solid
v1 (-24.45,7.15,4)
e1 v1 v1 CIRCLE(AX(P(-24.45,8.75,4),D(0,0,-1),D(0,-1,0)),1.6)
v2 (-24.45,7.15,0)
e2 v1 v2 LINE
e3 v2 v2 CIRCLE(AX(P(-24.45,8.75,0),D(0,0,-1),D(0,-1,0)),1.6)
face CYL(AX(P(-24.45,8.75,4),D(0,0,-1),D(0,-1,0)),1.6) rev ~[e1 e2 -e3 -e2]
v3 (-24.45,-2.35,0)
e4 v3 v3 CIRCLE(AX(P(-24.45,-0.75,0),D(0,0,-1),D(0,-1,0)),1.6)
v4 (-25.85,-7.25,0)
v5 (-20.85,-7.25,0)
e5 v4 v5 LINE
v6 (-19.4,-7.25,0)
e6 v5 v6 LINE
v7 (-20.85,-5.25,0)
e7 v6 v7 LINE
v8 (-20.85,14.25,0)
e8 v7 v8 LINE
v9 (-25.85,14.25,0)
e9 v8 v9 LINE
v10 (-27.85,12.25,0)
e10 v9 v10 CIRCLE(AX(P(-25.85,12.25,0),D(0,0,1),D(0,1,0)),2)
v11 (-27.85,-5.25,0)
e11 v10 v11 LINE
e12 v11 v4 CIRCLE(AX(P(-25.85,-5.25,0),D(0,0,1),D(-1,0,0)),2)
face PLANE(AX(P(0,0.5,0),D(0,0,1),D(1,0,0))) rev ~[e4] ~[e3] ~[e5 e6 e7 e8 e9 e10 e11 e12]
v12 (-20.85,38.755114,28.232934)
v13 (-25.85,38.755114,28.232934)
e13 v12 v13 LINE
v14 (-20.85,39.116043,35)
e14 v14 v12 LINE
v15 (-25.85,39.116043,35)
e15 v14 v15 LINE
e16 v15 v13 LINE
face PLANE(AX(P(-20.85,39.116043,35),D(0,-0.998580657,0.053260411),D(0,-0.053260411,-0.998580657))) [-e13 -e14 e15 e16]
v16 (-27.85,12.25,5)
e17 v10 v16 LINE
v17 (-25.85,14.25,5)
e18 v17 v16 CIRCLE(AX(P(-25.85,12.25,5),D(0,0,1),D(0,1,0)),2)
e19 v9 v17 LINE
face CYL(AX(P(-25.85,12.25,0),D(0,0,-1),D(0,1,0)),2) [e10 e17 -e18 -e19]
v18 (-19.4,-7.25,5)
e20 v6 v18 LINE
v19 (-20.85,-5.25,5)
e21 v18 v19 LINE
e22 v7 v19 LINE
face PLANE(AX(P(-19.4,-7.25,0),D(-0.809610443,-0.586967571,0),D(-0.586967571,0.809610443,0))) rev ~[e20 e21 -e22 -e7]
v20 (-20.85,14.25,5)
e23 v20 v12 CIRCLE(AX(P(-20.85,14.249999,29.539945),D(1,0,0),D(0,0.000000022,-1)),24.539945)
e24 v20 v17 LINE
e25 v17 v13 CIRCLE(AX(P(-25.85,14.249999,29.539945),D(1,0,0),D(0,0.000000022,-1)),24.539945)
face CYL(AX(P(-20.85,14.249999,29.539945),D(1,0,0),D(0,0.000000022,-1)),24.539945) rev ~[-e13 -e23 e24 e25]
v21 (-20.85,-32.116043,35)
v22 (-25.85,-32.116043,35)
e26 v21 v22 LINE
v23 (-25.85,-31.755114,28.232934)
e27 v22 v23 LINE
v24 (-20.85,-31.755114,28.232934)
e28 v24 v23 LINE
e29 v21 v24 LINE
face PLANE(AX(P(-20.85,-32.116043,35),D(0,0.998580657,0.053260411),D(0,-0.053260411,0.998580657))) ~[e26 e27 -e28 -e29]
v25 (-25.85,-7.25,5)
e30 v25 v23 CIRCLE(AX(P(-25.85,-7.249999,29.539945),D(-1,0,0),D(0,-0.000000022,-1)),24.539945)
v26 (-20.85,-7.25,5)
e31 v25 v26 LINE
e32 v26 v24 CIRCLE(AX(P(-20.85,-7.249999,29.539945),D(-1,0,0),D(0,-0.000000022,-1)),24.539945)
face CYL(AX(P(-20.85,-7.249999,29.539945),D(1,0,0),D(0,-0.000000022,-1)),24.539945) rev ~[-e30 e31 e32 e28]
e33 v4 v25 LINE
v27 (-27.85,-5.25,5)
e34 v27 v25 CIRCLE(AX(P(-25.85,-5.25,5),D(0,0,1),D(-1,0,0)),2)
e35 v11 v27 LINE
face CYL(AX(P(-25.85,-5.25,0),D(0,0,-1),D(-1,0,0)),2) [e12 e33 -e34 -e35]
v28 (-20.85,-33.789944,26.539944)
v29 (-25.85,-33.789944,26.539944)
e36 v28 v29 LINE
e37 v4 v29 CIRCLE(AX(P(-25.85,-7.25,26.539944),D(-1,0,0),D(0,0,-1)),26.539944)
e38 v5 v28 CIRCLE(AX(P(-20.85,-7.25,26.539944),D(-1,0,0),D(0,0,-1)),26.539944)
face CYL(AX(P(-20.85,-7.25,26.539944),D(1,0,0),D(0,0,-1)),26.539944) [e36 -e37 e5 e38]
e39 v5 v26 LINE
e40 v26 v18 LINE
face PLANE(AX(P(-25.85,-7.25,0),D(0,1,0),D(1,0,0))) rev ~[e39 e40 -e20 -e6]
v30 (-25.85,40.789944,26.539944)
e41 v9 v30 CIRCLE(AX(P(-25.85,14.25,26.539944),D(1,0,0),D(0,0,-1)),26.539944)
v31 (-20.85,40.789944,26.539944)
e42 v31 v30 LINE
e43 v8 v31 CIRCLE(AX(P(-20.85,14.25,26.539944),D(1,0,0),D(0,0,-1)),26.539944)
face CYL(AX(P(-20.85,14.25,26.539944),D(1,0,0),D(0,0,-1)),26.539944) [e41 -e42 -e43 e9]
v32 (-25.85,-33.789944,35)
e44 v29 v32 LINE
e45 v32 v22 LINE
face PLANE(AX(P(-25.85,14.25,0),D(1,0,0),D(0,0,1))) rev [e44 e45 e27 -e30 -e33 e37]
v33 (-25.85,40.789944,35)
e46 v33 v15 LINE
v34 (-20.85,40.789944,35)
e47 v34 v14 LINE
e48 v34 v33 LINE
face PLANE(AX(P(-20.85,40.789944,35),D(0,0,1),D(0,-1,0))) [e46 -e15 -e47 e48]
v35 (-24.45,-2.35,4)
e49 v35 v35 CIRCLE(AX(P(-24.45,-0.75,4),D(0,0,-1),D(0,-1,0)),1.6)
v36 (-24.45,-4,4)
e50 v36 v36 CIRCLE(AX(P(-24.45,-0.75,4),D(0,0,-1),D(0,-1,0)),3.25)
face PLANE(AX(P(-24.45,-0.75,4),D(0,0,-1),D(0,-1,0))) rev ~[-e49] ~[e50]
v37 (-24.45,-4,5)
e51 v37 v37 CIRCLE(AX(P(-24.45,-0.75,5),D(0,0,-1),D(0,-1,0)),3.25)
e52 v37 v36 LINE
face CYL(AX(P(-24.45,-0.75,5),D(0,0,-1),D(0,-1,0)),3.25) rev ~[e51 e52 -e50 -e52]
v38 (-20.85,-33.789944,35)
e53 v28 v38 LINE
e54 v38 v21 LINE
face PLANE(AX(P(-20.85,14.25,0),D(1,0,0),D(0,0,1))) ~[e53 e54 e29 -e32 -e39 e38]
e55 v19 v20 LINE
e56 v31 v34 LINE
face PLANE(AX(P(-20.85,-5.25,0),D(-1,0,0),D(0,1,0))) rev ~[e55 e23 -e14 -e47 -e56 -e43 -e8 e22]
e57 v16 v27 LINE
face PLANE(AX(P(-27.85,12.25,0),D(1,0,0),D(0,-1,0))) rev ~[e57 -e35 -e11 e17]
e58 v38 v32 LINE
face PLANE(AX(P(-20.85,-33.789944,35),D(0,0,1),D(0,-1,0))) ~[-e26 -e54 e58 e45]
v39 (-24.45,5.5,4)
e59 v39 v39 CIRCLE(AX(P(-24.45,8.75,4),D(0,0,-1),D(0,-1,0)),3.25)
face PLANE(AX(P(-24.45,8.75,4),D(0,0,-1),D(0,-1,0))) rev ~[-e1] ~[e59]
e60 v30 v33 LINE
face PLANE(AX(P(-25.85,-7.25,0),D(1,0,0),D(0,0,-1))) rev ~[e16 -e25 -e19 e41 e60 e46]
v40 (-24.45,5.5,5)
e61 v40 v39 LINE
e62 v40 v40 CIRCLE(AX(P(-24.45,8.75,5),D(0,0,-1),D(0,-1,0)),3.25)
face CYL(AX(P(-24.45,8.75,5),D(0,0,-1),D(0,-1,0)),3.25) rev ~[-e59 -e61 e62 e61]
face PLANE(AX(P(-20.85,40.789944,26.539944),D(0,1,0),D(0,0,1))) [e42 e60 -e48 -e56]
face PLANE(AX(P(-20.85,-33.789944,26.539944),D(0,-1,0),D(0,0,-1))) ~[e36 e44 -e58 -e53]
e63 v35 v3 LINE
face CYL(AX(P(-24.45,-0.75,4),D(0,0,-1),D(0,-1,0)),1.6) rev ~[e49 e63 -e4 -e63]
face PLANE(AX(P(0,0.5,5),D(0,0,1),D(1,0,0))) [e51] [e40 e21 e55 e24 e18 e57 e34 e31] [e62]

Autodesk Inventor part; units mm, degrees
ref_plane "YZ Plane" through (0, 0, 0) normal (1, 0, 0) x (0, 1, 0)
ref_plane "XZ Plane" through (0, 0, 0) normal (0, 1, 0) x (-1, 0, 0)
ref_plane "XY Plane" through (0, 0, 0) normal (0, 0, 1) x (1, 0, 0)
ref_plane "Work Plane1" through (0, 0.5, 0) normal (0, 0, 1) x (1, 0, 0)
sketch "Sketch1" plane through (0, 0.5, 0) normal (0, 0, 1) x (1, 0, 0)
  arc A0 (-25.85, 13.75) -> (-27.85, 11.75) centre (-25.85, 11.75) ccw
  line L0 (-27.85, 11.75) -> (-27.85, -5.75)
  arc A1 (-27.85, -5.75) -> (-25.85, -7.75) centre (-25.85, -5.75) ccw
  line L1 (-25.85, -7.75) -> (-19.4, -7.75)
  arc A2 (-17.4, -9.75) -> (-19.4, -7.75) centre (-19.4, -9.75) ccw
  line L2 (-17.4, -9.75) -> (-17.4, -12.466667)
  arc A3 (-17.4, -12.466667) -> (-15.4, -14.466667) centre (-15.4, -12.466667) ccw
  line L3 (-15.4, -14.466667) -> (1.1, -14.466667)
  arc A4 (1.1, -14.466667) -> (3.1, -12.466667) centre (1.1, -12.466667) ccw
  line L4 (3.1, -12.466667) -> (3.1, -9.75)
  arc A5 (5.1, -7.75) -> (3.1, -9.75) centre (5.1, -9.75) ccw
  line L5 (5.1, -7.75) -> (24.95, -7.75)
  arc A6 (24.95, -7.75) -> (26.95, -5.75) centre (24.95, -5.75) ccw
  line L6 (26.95, -5.75) -> (26.95, 11.941667)
  arc A7 (26.95, 11.941667) -> (24.95, 13.941667) centre (24.95, 11.941667) ccw
  line L7 (24.95, 13.941667) -> (19.95, 13.941667)
  line L8 (19.95, 13.941667) -> (19.95, -5.75)
  line L9 (19.95, -5.75) -> (1.6, -5.75)
  line L10 (1.6, -5.75) -> (1.1, -12.466667)
  line L11 (1.1, -12.466667) -> (-13.9, -12.75)
  line L12 (-15.4, -12.75) -> (-15.4, -5.75)
  line L13 (-15.4, -5.75) -> (-20.85, -5.75)
  line L14 (-20.85, -5.75) -> (-20.85, 13.75)
  line L15 (-20.85, 13.75) -> (-25.85, 13.75)
  circle A8 centre (23.55, -1.25) radius 1.25
  circle A9 centre (-24.45, -1.25) radius 1.25
  circle A10 centre (-24.45, 8.25) radius 1.25
  circle A11 centre (23.55, 8.25) radius 1.25
  line L16 (-20.4, -5.75) -> (-20.4, -7.75)
  line L17 (-13.9, -12.75) -> (-15.4, -12.75)
  point P0 (0, -0.5)
sketch "Sketch1 outline for Extrusion1" plane through (0, 0.5, 0) normal (0, 0, 1) x (1, 0, 0)
  line L0 (-20.85, -5.75) -> (-20.85, 13.75)
  line L1 (-19.4, -7.75) -> (-20.85, -5.75)
  line L2 (-20.85, 13.75) -> (-25.85, 13.75)
  line L3 (-25.85, -7.75) -> (-19.4, -7.75)
  arc A0 (-25.85, 13.75) -> (-27.85, 11.75) centre (-25.85, 11.75) ccw
  arc A1 (-27.85, -5.75) -> (-25.85, -7.75) centre (-25.85, -5.75) ccw
  line L4 (-27.85, 11.75) -> (-27.85, -5.75)
  circle A2 centre (-24.45, -1.25) radius 1.25
  circle A3 centre (-24.45, 8.25) radius 1.25
extrude "Extrusion1" add sketch "Sketch1 outline for Extrusion1" along normal blind 5
ref_plane "Work Plane2" through (-25.85, 3.5, 0) normal (0, -1, 0) x (1, 0, 0)
sketch "Sketch3" plane through (-20.85, -7.25, 0) normal (1, 0, 0) x (0, 0, -1)
  line L0 (0, 19.5) -> (-5, 19.5)
  line L1 (0, 21.5) -> (-5, 21.5)
  line L2 (0, 21.5) -> (0, 19.5)
  arc A0 (0, 21.5) -> (-26.539944, 48.039944) centre (-26.539944, 21.5) ccw
  line L3 (-26.539944, 48.039944) -> (-35, 48.039944)
  line L4 (-35, 48.039944) -> (-35, 46.366043)
  line L5 (-35, 46.366043) -> (-28.232934, 46.005114)
  arc A1 (-5, 21.5) -> (-28.232934, 46.005114) centre (-29.539944, 21.5) ccw
  line L6 (-5, 2) -> (-5, 21.5)
  line L7 (0, 2) -> (0, 21.5)
  point P0 (0, 7.25)
  point P1 (-5, 0)
  point P2 (0, 0)
  dimension "d9" = 3
  dimension "d12" = 35
extrude "Extrusion2" add sketch "Sketch3" against normal blind 5 contours L1 A1 L5 L4 L3 A0
sketch "Sketch2" plane through (0, 0.5, 5) normal (0, 0, 1) x (1, 0, 0)
  circle A0 centre (-24.45, -1.25) radius 1.25 projected
  circle A1 centre (-24.45, 8.25) radius 1.25 projected
  point P0 (0, -0.5)
hole "Hole1" at (-24.45, -0.75, 5) at (-24.45, 8.75, 5) direction (0, 0, -1) diameter 3.2 end through all counterbore diameter 6.5 counterbore depth 1
mirror "Mirror1" about plane through (-25.85, 3.5, 0) normal (0, -1, 0) of "Extrusion2"
properties part number "leg"
